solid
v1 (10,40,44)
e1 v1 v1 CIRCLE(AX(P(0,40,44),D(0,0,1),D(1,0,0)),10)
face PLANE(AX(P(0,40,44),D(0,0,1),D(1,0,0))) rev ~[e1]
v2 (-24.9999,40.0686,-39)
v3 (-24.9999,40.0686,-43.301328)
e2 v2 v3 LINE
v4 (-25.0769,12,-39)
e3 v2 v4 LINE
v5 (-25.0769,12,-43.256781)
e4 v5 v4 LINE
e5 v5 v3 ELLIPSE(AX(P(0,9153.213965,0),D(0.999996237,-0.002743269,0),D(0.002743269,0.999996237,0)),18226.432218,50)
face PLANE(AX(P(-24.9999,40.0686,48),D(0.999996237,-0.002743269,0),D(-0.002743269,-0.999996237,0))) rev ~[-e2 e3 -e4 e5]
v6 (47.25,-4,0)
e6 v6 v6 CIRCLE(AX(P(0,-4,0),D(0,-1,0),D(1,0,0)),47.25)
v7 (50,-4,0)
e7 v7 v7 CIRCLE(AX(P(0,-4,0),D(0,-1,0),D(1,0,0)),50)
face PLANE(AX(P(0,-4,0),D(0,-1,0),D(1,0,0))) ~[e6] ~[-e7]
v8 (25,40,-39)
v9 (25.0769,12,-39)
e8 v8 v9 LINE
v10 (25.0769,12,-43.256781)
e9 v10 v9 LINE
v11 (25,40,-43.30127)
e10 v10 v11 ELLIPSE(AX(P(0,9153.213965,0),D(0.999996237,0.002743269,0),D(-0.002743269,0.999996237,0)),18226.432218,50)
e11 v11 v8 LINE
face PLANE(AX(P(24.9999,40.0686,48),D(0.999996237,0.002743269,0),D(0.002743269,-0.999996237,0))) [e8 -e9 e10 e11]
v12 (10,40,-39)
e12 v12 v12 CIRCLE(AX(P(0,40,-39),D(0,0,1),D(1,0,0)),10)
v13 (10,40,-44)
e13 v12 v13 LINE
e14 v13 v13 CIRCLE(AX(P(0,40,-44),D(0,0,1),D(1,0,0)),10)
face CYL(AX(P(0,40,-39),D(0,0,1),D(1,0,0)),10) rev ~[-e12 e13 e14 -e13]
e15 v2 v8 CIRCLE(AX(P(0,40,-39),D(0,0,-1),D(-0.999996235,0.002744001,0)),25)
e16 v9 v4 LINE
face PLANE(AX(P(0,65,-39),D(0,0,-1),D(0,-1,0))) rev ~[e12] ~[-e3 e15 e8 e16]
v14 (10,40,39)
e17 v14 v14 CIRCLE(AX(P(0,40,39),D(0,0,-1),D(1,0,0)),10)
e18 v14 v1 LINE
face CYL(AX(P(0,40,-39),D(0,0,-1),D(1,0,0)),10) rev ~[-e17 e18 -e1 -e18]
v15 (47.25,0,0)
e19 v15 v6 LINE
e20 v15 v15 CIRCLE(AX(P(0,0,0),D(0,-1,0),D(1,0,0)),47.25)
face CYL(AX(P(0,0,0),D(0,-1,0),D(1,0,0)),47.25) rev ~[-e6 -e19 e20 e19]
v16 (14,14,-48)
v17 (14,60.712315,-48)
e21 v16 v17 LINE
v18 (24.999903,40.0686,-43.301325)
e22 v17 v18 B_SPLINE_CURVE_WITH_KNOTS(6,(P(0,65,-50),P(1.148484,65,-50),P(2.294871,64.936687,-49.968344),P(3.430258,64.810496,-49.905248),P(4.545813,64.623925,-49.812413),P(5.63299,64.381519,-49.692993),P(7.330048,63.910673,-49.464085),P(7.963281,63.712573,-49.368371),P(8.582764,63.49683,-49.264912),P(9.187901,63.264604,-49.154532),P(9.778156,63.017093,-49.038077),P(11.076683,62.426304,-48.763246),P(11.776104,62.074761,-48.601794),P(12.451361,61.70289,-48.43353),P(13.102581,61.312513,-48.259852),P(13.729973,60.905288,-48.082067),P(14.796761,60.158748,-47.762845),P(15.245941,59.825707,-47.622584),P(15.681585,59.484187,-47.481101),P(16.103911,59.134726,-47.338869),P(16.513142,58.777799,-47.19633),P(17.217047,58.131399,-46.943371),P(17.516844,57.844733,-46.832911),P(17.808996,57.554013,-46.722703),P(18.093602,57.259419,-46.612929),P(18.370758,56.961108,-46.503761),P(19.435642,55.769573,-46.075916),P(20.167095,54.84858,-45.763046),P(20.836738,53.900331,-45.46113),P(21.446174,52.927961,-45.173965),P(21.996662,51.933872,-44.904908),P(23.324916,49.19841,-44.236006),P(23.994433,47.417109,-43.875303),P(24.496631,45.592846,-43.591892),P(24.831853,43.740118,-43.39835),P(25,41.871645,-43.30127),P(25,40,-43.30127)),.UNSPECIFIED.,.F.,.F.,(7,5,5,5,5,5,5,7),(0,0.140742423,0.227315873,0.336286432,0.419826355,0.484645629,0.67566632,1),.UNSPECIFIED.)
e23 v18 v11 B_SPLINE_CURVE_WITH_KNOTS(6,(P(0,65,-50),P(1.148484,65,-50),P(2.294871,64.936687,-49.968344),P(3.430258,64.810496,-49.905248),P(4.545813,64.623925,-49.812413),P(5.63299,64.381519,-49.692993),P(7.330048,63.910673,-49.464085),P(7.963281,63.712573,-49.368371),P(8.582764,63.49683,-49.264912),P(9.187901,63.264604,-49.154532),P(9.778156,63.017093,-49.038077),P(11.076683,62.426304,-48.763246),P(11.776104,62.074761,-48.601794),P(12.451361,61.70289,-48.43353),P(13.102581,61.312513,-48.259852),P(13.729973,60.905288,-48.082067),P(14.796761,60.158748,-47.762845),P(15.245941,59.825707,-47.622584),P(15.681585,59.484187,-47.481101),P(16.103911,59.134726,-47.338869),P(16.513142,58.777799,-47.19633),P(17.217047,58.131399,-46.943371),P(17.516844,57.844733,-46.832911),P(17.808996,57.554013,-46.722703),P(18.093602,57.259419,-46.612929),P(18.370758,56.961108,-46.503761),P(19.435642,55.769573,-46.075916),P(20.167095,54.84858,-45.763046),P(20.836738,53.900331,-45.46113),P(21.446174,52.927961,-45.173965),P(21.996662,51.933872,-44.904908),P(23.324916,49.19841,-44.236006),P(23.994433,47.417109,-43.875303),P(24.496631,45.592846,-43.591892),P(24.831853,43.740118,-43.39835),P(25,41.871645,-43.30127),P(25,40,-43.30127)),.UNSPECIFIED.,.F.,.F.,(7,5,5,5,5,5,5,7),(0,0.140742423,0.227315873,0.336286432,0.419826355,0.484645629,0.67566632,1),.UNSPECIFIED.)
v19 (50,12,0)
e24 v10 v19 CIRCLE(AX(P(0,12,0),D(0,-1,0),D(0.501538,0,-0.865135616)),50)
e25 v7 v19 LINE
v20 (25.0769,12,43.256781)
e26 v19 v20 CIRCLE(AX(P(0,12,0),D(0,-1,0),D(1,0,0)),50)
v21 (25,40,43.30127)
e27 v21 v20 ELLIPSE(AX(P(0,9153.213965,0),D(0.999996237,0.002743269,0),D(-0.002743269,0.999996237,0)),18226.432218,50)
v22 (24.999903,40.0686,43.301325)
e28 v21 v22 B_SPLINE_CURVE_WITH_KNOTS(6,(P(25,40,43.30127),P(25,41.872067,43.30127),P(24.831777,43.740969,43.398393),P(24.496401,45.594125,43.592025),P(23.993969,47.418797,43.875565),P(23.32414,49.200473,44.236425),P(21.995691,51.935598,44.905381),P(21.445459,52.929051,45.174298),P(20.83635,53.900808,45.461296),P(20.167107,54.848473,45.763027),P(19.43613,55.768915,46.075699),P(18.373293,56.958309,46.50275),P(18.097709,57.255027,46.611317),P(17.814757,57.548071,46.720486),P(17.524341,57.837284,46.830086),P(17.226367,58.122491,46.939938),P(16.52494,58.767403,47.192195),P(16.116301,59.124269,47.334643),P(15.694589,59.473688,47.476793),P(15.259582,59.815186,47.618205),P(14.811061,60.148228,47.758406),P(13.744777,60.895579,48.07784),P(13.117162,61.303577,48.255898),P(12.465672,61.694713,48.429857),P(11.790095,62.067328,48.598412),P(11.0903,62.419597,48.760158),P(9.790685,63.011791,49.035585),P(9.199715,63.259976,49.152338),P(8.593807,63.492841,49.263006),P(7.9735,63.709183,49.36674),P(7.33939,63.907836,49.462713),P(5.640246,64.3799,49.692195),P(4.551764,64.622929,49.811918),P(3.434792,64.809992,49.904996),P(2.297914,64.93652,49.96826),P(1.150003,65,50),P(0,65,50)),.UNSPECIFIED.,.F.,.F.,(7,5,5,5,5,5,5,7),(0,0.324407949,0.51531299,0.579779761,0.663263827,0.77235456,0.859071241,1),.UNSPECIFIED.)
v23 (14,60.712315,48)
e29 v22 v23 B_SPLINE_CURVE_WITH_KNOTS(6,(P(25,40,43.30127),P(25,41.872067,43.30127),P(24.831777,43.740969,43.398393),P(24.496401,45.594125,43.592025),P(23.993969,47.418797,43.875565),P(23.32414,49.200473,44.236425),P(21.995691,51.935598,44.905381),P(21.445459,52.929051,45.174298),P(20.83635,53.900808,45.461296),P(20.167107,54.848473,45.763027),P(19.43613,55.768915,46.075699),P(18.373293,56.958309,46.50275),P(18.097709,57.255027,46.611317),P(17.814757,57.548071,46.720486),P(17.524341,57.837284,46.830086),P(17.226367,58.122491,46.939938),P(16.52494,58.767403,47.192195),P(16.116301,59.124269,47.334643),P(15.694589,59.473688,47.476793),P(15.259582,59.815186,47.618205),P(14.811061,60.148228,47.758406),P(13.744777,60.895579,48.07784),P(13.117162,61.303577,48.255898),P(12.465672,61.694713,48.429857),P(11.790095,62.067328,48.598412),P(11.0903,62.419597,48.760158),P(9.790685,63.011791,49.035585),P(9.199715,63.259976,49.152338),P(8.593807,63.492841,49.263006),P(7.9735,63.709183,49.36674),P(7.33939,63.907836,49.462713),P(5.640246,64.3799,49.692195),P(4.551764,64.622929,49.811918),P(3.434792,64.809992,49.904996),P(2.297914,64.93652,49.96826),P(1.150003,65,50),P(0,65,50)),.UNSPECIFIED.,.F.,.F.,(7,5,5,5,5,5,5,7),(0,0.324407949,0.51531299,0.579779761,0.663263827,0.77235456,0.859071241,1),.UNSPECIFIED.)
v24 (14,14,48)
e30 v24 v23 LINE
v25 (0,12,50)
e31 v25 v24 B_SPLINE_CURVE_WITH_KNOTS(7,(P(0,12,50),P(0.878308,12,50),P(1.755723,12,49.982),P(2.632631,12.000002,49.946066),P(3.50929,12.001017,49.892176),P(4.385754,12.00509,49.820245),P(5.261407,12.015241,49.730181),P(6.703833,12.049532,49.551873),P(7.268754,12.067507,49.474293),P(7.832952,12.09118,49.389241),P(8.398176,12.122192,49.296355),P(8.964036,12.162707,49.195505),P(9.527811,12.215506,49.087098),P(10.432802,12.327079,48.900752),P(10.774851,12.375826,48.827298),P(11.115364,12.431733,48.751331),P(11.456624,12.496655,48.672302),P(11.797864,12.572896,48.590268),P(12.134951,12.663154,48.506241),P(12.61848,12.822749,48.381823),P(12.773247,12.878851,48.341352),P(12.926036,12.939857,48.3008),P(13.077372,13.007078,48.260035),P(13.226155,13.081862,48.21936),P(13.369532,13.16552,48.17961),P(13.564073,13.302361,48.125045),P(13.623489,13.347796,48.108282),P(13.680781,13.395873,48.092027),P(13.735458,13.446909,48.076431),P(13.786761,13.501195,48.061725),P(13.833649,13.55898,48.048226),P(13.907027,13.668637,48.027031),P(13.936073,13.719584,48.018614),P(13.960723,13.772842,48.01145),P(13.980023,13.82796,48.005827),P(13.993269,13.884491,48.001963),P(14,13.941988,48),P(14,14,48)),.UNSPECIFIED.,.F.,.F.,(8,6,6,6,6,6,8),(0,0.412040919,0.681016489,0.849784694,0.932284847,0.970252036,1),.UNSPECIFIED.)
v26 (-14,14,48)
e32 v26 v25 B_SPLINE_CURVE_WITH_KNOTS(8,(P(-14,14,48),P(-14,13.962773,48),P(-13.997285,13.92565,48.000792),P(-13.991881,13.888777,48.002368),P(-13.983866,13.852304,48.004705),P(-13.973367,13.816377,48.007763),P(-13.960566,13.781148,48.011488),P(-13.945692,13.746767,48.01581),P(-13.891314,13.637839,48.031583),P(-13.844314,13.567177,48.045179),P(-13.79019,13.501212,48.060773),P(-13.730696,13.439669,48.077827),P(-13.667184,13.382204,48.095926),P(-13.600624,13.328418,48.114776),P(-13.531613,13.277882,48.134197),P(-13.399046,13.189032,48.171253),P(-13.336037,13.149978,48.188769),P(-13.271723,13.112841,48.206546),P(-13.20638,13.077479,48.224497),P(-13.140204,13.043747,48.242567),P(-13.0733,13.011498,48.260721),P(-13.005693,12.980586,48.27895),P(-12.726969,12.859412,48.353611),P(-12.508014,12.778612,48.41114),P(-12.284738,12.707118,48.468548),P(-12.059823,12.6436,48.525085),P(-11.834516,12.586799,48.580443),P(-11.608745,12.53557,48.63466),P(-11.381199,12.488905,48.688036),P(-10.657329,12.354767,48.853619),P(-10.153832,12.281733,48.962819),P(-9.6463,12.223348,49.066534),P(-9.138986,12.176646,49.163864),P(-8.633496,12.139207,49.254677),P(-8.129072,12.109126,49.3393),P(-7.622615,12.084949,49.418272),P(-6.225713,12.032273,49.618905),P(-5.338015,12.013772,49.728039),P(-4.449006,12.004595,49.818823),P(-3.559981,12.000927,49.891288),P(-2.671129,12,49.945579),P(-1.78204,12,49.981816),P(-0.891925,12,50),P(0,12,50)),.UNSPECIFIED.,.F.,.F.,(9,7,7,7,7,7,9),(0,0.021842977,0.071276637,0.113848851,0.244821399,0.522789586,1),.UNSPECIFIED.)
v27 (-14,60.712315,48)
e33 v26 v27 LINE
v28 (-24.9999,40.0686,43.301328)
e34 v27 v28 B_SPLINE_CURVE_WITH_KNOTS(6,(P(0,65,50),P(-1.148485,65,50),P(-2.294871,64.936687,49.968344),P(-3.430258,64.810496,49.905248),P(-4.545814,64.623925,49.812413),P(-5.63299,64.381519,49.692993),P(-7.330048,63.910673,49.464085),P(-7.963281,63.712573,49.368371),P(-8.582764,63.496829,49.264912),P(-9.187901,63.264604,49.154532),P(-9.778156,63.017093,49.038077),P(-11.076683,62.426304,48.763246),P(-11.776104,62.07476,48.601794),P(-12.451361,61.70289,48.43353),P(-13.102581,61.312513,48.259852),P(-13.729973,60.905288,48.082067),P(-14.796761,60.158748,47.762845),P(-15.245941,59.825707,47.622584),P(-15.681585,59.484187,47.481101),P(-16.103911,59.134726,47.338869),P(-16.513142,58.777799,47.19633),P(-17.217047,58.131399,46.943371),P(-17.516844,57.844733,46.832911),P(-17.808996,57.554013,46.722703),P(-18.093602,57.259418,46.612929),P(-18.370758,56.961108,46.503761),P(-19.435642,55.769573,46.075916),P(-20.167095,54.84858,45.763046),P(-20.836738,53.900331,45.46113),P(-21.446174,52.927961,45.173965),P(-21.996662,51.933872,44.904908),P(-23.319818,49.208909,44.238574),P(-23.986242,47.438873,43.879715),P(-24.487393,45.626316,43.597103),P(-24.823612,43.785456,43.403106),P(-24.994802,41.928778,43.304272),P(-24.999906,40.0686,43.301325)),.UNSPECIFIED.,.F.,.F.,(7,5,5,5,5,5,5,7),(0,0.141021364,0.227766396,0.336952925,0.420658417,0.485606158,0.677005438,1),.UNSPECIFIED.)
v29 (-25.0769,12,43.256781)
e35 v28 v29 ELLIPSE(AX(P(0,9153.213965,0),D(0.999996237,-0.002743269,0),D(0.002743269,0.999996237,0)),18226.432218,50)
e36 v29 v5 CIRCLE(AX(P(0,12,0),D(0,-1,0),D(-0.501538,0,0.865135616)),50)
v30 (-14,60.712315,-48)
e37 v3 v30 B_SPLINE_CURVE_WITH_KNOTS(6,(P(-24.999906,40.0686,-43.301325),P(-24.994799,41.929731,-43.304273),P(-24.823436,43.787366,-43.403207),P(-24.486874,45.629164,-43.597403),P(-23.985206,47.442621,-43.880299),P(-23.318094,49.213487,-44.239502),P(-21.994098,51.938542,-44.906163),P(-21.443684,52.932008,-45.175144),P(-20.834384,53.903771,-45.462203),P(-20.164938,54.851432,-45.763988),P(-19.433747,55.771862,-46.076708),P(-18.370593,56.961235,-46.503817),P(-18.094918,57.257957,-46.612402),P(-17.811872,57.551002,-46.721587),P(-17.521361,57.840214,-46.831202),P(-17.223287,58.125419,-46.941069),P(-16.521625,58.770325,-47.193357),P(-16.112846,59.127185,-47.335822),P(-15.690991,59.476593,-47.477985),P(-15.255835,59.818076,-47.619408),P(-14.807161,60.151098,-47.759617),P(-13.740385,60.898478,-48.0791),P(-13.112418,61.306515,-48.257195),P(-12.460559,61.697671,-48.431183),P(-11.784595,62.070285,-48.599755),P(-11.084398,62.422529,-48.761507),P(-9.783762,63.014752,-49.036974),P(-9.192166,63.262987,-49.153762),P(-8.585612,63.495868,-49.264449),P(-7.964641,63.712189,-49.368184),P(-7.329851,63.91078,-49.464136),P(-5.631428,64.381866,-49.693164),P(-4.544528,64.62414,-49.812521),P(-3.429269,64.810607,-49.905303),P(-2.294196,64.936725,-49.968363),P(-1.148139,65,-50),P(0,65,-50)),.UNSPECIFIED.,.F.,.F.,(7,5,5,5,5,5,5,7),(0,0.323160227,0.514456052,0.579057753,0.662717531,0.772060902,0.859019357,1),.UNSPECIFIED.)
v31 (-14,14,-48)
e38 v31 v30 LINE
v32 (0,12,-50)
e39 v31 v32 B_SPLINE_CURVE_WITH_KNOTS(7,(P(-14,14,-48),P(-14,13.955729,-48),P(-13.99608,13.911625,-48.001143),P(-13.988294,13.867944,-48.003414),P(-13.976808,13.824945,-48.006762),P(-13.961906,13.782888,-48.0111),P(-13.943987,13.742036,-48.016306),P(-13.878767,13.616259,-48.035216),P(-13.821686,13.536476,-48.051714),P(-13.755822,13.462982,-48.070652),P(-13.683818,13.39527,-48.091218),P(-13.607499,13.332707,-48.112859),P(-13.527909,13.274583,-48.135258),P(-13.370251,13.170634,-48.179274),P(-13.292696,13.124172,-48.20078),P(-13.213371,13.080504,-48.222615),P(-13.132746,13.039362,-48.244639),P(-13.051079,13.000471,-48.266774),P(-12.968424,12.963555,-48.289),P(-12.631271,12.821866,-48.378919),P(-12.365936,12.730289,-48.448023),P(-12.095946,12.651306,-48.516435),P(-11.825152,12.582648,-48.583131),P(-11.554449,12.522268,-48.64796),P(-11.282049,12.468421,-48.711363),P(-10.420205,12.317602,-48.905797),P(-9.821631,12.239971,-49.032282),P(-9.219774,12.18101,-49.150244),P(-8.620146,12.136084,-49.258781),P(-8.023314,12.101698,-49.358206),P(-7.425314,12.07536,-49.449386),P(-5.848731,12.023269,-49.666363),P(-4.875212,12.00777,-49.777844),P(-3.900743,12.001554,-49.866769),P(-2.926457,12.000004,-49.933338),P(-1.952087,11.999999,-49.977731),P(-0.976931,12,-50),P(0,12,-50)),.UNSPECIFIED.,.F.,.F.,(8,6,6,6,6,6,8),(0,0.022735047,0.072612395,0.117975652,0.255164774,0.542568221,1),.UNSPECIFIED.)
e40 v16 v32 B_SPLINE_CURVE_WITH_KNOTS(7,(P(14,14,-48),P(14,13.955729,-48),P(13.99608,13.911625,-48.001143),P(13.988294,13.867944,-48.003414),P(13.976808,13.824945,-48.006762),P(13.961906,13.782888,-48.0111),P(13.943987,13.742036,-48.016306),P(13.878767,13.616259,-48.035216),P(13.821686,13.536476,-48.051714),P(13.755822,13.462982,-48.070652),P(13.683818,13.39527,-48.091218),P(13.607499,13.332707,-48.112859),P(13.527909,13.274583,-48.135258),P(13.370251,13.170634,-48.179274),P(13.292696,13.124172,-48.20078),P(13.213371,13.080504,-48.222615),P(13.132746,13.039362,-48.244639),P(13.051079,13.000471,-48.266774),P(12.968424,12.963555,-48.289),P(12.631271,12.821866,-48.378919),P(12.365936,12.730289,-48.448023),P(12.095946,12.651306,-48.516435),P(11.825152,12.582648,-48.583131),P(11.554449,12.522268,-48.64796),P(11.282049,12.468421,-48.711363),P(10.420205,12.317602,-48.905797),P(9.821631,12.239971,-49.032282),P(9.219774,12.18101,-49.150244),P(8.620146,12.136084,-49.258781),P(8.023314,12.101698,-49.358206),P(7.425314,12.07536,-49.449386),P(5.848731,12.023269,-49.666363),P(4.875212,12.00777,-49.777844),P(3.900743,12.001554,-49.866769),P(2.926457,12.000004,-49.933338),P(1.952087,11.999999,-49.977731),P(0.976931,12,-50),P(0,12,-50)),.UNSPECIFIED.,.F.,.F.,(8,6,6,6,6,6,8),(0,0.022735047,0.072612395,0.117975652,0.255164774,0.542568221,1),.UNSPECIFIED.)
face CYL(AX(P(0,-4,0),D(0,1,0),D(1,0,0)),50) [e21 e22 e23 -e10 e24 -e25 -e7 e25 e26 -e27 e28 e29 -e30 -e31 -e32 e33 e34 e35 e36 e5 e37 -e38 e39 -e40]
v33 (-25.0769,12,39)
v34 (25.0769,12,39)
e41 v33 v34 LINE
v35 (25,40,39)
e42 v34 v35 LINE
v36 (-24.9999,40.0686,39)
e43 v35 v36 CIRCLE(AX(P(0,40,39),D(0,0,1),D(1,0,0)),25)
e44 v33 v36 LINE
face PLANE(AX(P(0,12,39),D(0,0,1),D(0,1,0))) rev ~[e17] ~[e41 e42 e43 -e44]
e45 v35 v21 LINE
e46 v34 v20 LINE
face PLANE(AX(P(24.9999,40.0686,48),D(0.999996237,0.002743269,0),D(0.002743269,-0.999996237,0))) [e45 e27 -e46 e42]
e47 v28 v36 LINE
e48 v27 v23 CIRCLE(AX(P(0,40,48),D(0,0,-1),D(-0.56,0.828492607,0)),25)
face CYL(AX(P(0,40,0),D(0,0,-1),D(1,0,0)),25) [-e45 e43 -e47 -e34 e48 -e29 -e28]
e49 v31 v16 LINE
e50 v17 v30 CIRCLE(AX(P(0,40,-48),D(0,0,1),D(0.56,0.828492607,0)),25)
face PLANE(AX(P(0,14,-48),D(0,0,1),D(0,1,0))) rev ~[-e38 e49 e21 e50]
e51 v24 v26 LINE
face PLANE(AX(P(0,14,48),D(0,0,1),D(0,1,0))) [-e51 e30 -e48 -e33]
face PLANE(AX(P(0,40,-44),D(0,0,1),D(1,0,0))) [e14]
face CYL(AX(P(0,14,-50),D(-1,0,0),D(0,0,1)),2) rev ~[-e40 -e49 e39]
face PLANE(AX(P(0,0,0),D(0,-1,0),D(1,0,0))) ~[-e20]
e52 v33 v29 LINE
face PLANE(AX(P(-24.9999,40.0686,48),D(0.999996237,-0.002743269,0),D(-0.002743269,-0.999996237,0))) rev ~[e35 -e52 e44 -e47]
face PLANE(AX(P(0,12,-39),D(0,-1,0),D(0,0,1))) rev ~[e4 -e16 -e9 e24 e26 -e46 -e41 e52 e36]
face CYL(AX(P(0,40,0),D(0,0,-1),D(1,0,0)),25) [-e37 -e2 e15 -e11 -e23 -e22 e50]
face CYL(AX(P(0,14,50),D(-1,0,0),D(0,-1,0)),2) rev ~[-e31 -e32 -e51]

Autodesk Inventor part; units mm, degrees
ref_plane "YZ Plane" through (0, 0, 0) normal (1, 0, 0) x (0, 1, 0)
ref_plane "XZ Plane" through (0, 0, 0) normal (0, 1, 0) x (-1, 0, 0)
ref_plane "XY Plane" through (0, 0, 0) normal (0, 0, 1) x (1, 0, 0)
sketch "Sketch1" plane through (0, 0, 0) normal (0, 0, 1) x (1, 0, 0)
  line L0 (0, 0) -> (47.25, 0)
  line L1 (47.25, 0) -> (47.25, -4)
  line L2 (47.25, -4) -> (50, -4)
  line L3 (50, -4) -> (50, 65)
  line L4 (50, 65) -> (0, 65)
  line L5 (0, 65) -> (0, 0)
  dimension "d0" = 100
  dimension "d1" = 94.5
  dimension "d2" = 4
  dimension "d3" = 65
revolve "Revolution1" add sketch "Sketch1" angle 360 about axis through (0, 65, 0) along (0, -1, 0)
sketch "Sketch2" plane through (0, 0, 0) normal (0, 0, 1) x (1, 0, 0)
  line L0 (-50, 65) -> (-50, -4) projected
  line L1 (-50, 12) -> (50, 12)
  circle A0 centre (0, 40) radius 25
  line L2 (-50, 65) -> (50, 65) projected
  line L3 (0, 0) -> (0, 65) construction
  arc A1 (-50, 12) -> (-24.9999, 40.0686) centre (-53.3441, 40.1463) ccw
  arc A2 (24.9999, 40.0686) -> (50, 12) centre (53.3441, 40.1463) ccw
  line L4 (50, 65) -> (50, -4) projected
  point P0 (0, 12)
  point P1 (0, 65)
  dimension "d5" = 12
  dimension "d6" = 50
  dimension "d7" = 28.0686
  dimension "d8" = 28.0686
extrude "Extrusion1" cut sketch "Sketch2" along normal through all both and the other way through all contours L2 A0 A1 L0 | L2 L4 A2 A0
sketch "Sketch4" plane through (0, 0, 0) normal (1, 0, 0) x (0, 1, 0)
  line L0 (65, 50) -> (-4, 50) projected
  line L1 (12, 50) -> (12, 50)
  line L2 (14, -48) -> (65, -48)
  line L3 (14, 48) -> (65, 48)
  line L4 (65, 50) -> (65, -50) projected
  line L5 (0, 47.25) -> (0, -47.25) projected
  line L6 (65, -50) -> (-4, -50) projected
  arc A0 (12, 50) -> (14, 48) centre (14, 50) ccw
  line L7 (12, -50) -> (12, -50)
  arc A1 (14, -48) -> (12, -50) centre (14, -50) ccw
  line L8 (65, -39) -> (12, -39)
  line L9 (12, -39) -> (12, 39)
  line L10 (12, 39) -> (65, 39)
  line L11 (65, 39) -> (65, -39)
  line L12 (12, -50) -> (65, -50)
  line L13 (65, -48) -> (65, -50)
  line L14 (12, 50) -> (65, 50)
  line L15 (65, 50) -> (65, 48)
  point P0 (0, 0)
  point P1 (12, -48)
  point P2 (65, 39)
  dimension "d14" = 2
  dimension "d15" = 12
  dimension "d16" = 2
  dimension "d17" = 2
  dimension "d18" = 2
  dimension "d19" = 12
  dimension "d20" = 9
  dimension "d21" = 9
extrude "Extrusion2" cut sketch "Sketch4" along normal through all both and the other way through all
sketch "Sketch5" plane through (0, 40, 48) normal (0, 0, 1) x (1, 0, 0)
  line L0 (-31.289, -28) -> (31.289, -28) projected
  line L1 (-31.289, -28) -> (-25.0769, -28)
  spline S0 degree 7 poles (-24.9999, 0.0686) (-25.0047, -1.665) (-25.1331, -3.4008) (-25.3859, -5.1281) (-25.7625, -6.8362) (-26.2611, -8.5141) (-26.8789, -10.1513) (-27.8149, -12.1783) (-28.0274, -12.6153) (-28.2486, -13.0478) (-28.478, -13.4752) (-28.7156, -13.8974) (-28.961, -14.3139) (-29.4863, -15.1662) (-29.7674, -15.6012) (-30.057, -16.029) (-30.3544, -16.4489) (-30.6593, -16.8605) (-30.971, -17.2634) (-31.289, -17.6573) knots 0 0 0 0 0 0 0 0 0.63383 0.63383 0.63383 0.63383 0.63383 0.63383 0.810222 0.810222 0.810222 0.810222 0.810222 0.810222 1 1 1 1 1 1 1 1 projected
  line L2 (-31.289, -17.6573) -> (-31.289, -28) projected
  spline S1 degree 7 poles (31.289, -17.6573) (30.9729, -17.2657) (30.6629, -16.8652) (30.3597, -16.456) (30.0639, -16.0387) (29.7758, -15.6136) (29.4961, -15.1814) (28.9731, -14.3341) (28.7285, -13.9199) (28.4918, -13.5001) (28.263, -13.075) (28.0425, -12.645) (27.8305, -12.2104) (26.8905, -10.182) (26.269, -8.5404) (25.7672, -6.8576) (25.3883, -5.1443) (25.1339, -3.4117) (25.0047, -1.6704) (24.9999, 0.0686) knots 0 0 0 0 0 0 0 0 0.188676 0.188676 0.188676 0.188676 0.188676 0.188676 0.364186 0.364186 0.364186 0.364186 0.364186 0.364186 1 1 1 1 1 1 1 1 projected
  line L3 (31.289, -28) -> (31.289, -17.6573) projected
  arc A0 (24.9999, 0.0686) -> (31.289, -17.6573) centre (53.3441, 0.1463) ccw projected
  line L4 (24.9999, 0.0686) -> (25.0769, -28)
  line L5 (25.0769, -28) -> (31.289, -28)
  arc A1 (-31.289, -17.6573) -> (-24.9999, 0.0686) centre (-53.3441, 0.1463) ccw projected
  line L6 (-24.9999, 0.0686) -> (-25.0769, -28)
  point P0 (0, -40)
  point P1 (24.9999, -28)
extrude "Extrusion3" cut sketch "Sketch5" along normal through all both and the other way through all
sketch "Sketch6" plane through (0, 40, -39) normal (0, 0, 1) x (1, 0, 0)
  arc A0 (14, 20.7123) -> (-14, 20.7123) centre (0, 0) ccw projected
  circle A1 centre (0, 0) radius 10
  point P0 (0, -40)
  dimension "d26" = 20
extrude "Extrusion4" cut sketch "Sketch6" along normal blind 83 and the other way blind 5
equation "\"d8\" = d7"
equation "\"d21\" = d20"
properties part number "Arm 1 v0.1"
